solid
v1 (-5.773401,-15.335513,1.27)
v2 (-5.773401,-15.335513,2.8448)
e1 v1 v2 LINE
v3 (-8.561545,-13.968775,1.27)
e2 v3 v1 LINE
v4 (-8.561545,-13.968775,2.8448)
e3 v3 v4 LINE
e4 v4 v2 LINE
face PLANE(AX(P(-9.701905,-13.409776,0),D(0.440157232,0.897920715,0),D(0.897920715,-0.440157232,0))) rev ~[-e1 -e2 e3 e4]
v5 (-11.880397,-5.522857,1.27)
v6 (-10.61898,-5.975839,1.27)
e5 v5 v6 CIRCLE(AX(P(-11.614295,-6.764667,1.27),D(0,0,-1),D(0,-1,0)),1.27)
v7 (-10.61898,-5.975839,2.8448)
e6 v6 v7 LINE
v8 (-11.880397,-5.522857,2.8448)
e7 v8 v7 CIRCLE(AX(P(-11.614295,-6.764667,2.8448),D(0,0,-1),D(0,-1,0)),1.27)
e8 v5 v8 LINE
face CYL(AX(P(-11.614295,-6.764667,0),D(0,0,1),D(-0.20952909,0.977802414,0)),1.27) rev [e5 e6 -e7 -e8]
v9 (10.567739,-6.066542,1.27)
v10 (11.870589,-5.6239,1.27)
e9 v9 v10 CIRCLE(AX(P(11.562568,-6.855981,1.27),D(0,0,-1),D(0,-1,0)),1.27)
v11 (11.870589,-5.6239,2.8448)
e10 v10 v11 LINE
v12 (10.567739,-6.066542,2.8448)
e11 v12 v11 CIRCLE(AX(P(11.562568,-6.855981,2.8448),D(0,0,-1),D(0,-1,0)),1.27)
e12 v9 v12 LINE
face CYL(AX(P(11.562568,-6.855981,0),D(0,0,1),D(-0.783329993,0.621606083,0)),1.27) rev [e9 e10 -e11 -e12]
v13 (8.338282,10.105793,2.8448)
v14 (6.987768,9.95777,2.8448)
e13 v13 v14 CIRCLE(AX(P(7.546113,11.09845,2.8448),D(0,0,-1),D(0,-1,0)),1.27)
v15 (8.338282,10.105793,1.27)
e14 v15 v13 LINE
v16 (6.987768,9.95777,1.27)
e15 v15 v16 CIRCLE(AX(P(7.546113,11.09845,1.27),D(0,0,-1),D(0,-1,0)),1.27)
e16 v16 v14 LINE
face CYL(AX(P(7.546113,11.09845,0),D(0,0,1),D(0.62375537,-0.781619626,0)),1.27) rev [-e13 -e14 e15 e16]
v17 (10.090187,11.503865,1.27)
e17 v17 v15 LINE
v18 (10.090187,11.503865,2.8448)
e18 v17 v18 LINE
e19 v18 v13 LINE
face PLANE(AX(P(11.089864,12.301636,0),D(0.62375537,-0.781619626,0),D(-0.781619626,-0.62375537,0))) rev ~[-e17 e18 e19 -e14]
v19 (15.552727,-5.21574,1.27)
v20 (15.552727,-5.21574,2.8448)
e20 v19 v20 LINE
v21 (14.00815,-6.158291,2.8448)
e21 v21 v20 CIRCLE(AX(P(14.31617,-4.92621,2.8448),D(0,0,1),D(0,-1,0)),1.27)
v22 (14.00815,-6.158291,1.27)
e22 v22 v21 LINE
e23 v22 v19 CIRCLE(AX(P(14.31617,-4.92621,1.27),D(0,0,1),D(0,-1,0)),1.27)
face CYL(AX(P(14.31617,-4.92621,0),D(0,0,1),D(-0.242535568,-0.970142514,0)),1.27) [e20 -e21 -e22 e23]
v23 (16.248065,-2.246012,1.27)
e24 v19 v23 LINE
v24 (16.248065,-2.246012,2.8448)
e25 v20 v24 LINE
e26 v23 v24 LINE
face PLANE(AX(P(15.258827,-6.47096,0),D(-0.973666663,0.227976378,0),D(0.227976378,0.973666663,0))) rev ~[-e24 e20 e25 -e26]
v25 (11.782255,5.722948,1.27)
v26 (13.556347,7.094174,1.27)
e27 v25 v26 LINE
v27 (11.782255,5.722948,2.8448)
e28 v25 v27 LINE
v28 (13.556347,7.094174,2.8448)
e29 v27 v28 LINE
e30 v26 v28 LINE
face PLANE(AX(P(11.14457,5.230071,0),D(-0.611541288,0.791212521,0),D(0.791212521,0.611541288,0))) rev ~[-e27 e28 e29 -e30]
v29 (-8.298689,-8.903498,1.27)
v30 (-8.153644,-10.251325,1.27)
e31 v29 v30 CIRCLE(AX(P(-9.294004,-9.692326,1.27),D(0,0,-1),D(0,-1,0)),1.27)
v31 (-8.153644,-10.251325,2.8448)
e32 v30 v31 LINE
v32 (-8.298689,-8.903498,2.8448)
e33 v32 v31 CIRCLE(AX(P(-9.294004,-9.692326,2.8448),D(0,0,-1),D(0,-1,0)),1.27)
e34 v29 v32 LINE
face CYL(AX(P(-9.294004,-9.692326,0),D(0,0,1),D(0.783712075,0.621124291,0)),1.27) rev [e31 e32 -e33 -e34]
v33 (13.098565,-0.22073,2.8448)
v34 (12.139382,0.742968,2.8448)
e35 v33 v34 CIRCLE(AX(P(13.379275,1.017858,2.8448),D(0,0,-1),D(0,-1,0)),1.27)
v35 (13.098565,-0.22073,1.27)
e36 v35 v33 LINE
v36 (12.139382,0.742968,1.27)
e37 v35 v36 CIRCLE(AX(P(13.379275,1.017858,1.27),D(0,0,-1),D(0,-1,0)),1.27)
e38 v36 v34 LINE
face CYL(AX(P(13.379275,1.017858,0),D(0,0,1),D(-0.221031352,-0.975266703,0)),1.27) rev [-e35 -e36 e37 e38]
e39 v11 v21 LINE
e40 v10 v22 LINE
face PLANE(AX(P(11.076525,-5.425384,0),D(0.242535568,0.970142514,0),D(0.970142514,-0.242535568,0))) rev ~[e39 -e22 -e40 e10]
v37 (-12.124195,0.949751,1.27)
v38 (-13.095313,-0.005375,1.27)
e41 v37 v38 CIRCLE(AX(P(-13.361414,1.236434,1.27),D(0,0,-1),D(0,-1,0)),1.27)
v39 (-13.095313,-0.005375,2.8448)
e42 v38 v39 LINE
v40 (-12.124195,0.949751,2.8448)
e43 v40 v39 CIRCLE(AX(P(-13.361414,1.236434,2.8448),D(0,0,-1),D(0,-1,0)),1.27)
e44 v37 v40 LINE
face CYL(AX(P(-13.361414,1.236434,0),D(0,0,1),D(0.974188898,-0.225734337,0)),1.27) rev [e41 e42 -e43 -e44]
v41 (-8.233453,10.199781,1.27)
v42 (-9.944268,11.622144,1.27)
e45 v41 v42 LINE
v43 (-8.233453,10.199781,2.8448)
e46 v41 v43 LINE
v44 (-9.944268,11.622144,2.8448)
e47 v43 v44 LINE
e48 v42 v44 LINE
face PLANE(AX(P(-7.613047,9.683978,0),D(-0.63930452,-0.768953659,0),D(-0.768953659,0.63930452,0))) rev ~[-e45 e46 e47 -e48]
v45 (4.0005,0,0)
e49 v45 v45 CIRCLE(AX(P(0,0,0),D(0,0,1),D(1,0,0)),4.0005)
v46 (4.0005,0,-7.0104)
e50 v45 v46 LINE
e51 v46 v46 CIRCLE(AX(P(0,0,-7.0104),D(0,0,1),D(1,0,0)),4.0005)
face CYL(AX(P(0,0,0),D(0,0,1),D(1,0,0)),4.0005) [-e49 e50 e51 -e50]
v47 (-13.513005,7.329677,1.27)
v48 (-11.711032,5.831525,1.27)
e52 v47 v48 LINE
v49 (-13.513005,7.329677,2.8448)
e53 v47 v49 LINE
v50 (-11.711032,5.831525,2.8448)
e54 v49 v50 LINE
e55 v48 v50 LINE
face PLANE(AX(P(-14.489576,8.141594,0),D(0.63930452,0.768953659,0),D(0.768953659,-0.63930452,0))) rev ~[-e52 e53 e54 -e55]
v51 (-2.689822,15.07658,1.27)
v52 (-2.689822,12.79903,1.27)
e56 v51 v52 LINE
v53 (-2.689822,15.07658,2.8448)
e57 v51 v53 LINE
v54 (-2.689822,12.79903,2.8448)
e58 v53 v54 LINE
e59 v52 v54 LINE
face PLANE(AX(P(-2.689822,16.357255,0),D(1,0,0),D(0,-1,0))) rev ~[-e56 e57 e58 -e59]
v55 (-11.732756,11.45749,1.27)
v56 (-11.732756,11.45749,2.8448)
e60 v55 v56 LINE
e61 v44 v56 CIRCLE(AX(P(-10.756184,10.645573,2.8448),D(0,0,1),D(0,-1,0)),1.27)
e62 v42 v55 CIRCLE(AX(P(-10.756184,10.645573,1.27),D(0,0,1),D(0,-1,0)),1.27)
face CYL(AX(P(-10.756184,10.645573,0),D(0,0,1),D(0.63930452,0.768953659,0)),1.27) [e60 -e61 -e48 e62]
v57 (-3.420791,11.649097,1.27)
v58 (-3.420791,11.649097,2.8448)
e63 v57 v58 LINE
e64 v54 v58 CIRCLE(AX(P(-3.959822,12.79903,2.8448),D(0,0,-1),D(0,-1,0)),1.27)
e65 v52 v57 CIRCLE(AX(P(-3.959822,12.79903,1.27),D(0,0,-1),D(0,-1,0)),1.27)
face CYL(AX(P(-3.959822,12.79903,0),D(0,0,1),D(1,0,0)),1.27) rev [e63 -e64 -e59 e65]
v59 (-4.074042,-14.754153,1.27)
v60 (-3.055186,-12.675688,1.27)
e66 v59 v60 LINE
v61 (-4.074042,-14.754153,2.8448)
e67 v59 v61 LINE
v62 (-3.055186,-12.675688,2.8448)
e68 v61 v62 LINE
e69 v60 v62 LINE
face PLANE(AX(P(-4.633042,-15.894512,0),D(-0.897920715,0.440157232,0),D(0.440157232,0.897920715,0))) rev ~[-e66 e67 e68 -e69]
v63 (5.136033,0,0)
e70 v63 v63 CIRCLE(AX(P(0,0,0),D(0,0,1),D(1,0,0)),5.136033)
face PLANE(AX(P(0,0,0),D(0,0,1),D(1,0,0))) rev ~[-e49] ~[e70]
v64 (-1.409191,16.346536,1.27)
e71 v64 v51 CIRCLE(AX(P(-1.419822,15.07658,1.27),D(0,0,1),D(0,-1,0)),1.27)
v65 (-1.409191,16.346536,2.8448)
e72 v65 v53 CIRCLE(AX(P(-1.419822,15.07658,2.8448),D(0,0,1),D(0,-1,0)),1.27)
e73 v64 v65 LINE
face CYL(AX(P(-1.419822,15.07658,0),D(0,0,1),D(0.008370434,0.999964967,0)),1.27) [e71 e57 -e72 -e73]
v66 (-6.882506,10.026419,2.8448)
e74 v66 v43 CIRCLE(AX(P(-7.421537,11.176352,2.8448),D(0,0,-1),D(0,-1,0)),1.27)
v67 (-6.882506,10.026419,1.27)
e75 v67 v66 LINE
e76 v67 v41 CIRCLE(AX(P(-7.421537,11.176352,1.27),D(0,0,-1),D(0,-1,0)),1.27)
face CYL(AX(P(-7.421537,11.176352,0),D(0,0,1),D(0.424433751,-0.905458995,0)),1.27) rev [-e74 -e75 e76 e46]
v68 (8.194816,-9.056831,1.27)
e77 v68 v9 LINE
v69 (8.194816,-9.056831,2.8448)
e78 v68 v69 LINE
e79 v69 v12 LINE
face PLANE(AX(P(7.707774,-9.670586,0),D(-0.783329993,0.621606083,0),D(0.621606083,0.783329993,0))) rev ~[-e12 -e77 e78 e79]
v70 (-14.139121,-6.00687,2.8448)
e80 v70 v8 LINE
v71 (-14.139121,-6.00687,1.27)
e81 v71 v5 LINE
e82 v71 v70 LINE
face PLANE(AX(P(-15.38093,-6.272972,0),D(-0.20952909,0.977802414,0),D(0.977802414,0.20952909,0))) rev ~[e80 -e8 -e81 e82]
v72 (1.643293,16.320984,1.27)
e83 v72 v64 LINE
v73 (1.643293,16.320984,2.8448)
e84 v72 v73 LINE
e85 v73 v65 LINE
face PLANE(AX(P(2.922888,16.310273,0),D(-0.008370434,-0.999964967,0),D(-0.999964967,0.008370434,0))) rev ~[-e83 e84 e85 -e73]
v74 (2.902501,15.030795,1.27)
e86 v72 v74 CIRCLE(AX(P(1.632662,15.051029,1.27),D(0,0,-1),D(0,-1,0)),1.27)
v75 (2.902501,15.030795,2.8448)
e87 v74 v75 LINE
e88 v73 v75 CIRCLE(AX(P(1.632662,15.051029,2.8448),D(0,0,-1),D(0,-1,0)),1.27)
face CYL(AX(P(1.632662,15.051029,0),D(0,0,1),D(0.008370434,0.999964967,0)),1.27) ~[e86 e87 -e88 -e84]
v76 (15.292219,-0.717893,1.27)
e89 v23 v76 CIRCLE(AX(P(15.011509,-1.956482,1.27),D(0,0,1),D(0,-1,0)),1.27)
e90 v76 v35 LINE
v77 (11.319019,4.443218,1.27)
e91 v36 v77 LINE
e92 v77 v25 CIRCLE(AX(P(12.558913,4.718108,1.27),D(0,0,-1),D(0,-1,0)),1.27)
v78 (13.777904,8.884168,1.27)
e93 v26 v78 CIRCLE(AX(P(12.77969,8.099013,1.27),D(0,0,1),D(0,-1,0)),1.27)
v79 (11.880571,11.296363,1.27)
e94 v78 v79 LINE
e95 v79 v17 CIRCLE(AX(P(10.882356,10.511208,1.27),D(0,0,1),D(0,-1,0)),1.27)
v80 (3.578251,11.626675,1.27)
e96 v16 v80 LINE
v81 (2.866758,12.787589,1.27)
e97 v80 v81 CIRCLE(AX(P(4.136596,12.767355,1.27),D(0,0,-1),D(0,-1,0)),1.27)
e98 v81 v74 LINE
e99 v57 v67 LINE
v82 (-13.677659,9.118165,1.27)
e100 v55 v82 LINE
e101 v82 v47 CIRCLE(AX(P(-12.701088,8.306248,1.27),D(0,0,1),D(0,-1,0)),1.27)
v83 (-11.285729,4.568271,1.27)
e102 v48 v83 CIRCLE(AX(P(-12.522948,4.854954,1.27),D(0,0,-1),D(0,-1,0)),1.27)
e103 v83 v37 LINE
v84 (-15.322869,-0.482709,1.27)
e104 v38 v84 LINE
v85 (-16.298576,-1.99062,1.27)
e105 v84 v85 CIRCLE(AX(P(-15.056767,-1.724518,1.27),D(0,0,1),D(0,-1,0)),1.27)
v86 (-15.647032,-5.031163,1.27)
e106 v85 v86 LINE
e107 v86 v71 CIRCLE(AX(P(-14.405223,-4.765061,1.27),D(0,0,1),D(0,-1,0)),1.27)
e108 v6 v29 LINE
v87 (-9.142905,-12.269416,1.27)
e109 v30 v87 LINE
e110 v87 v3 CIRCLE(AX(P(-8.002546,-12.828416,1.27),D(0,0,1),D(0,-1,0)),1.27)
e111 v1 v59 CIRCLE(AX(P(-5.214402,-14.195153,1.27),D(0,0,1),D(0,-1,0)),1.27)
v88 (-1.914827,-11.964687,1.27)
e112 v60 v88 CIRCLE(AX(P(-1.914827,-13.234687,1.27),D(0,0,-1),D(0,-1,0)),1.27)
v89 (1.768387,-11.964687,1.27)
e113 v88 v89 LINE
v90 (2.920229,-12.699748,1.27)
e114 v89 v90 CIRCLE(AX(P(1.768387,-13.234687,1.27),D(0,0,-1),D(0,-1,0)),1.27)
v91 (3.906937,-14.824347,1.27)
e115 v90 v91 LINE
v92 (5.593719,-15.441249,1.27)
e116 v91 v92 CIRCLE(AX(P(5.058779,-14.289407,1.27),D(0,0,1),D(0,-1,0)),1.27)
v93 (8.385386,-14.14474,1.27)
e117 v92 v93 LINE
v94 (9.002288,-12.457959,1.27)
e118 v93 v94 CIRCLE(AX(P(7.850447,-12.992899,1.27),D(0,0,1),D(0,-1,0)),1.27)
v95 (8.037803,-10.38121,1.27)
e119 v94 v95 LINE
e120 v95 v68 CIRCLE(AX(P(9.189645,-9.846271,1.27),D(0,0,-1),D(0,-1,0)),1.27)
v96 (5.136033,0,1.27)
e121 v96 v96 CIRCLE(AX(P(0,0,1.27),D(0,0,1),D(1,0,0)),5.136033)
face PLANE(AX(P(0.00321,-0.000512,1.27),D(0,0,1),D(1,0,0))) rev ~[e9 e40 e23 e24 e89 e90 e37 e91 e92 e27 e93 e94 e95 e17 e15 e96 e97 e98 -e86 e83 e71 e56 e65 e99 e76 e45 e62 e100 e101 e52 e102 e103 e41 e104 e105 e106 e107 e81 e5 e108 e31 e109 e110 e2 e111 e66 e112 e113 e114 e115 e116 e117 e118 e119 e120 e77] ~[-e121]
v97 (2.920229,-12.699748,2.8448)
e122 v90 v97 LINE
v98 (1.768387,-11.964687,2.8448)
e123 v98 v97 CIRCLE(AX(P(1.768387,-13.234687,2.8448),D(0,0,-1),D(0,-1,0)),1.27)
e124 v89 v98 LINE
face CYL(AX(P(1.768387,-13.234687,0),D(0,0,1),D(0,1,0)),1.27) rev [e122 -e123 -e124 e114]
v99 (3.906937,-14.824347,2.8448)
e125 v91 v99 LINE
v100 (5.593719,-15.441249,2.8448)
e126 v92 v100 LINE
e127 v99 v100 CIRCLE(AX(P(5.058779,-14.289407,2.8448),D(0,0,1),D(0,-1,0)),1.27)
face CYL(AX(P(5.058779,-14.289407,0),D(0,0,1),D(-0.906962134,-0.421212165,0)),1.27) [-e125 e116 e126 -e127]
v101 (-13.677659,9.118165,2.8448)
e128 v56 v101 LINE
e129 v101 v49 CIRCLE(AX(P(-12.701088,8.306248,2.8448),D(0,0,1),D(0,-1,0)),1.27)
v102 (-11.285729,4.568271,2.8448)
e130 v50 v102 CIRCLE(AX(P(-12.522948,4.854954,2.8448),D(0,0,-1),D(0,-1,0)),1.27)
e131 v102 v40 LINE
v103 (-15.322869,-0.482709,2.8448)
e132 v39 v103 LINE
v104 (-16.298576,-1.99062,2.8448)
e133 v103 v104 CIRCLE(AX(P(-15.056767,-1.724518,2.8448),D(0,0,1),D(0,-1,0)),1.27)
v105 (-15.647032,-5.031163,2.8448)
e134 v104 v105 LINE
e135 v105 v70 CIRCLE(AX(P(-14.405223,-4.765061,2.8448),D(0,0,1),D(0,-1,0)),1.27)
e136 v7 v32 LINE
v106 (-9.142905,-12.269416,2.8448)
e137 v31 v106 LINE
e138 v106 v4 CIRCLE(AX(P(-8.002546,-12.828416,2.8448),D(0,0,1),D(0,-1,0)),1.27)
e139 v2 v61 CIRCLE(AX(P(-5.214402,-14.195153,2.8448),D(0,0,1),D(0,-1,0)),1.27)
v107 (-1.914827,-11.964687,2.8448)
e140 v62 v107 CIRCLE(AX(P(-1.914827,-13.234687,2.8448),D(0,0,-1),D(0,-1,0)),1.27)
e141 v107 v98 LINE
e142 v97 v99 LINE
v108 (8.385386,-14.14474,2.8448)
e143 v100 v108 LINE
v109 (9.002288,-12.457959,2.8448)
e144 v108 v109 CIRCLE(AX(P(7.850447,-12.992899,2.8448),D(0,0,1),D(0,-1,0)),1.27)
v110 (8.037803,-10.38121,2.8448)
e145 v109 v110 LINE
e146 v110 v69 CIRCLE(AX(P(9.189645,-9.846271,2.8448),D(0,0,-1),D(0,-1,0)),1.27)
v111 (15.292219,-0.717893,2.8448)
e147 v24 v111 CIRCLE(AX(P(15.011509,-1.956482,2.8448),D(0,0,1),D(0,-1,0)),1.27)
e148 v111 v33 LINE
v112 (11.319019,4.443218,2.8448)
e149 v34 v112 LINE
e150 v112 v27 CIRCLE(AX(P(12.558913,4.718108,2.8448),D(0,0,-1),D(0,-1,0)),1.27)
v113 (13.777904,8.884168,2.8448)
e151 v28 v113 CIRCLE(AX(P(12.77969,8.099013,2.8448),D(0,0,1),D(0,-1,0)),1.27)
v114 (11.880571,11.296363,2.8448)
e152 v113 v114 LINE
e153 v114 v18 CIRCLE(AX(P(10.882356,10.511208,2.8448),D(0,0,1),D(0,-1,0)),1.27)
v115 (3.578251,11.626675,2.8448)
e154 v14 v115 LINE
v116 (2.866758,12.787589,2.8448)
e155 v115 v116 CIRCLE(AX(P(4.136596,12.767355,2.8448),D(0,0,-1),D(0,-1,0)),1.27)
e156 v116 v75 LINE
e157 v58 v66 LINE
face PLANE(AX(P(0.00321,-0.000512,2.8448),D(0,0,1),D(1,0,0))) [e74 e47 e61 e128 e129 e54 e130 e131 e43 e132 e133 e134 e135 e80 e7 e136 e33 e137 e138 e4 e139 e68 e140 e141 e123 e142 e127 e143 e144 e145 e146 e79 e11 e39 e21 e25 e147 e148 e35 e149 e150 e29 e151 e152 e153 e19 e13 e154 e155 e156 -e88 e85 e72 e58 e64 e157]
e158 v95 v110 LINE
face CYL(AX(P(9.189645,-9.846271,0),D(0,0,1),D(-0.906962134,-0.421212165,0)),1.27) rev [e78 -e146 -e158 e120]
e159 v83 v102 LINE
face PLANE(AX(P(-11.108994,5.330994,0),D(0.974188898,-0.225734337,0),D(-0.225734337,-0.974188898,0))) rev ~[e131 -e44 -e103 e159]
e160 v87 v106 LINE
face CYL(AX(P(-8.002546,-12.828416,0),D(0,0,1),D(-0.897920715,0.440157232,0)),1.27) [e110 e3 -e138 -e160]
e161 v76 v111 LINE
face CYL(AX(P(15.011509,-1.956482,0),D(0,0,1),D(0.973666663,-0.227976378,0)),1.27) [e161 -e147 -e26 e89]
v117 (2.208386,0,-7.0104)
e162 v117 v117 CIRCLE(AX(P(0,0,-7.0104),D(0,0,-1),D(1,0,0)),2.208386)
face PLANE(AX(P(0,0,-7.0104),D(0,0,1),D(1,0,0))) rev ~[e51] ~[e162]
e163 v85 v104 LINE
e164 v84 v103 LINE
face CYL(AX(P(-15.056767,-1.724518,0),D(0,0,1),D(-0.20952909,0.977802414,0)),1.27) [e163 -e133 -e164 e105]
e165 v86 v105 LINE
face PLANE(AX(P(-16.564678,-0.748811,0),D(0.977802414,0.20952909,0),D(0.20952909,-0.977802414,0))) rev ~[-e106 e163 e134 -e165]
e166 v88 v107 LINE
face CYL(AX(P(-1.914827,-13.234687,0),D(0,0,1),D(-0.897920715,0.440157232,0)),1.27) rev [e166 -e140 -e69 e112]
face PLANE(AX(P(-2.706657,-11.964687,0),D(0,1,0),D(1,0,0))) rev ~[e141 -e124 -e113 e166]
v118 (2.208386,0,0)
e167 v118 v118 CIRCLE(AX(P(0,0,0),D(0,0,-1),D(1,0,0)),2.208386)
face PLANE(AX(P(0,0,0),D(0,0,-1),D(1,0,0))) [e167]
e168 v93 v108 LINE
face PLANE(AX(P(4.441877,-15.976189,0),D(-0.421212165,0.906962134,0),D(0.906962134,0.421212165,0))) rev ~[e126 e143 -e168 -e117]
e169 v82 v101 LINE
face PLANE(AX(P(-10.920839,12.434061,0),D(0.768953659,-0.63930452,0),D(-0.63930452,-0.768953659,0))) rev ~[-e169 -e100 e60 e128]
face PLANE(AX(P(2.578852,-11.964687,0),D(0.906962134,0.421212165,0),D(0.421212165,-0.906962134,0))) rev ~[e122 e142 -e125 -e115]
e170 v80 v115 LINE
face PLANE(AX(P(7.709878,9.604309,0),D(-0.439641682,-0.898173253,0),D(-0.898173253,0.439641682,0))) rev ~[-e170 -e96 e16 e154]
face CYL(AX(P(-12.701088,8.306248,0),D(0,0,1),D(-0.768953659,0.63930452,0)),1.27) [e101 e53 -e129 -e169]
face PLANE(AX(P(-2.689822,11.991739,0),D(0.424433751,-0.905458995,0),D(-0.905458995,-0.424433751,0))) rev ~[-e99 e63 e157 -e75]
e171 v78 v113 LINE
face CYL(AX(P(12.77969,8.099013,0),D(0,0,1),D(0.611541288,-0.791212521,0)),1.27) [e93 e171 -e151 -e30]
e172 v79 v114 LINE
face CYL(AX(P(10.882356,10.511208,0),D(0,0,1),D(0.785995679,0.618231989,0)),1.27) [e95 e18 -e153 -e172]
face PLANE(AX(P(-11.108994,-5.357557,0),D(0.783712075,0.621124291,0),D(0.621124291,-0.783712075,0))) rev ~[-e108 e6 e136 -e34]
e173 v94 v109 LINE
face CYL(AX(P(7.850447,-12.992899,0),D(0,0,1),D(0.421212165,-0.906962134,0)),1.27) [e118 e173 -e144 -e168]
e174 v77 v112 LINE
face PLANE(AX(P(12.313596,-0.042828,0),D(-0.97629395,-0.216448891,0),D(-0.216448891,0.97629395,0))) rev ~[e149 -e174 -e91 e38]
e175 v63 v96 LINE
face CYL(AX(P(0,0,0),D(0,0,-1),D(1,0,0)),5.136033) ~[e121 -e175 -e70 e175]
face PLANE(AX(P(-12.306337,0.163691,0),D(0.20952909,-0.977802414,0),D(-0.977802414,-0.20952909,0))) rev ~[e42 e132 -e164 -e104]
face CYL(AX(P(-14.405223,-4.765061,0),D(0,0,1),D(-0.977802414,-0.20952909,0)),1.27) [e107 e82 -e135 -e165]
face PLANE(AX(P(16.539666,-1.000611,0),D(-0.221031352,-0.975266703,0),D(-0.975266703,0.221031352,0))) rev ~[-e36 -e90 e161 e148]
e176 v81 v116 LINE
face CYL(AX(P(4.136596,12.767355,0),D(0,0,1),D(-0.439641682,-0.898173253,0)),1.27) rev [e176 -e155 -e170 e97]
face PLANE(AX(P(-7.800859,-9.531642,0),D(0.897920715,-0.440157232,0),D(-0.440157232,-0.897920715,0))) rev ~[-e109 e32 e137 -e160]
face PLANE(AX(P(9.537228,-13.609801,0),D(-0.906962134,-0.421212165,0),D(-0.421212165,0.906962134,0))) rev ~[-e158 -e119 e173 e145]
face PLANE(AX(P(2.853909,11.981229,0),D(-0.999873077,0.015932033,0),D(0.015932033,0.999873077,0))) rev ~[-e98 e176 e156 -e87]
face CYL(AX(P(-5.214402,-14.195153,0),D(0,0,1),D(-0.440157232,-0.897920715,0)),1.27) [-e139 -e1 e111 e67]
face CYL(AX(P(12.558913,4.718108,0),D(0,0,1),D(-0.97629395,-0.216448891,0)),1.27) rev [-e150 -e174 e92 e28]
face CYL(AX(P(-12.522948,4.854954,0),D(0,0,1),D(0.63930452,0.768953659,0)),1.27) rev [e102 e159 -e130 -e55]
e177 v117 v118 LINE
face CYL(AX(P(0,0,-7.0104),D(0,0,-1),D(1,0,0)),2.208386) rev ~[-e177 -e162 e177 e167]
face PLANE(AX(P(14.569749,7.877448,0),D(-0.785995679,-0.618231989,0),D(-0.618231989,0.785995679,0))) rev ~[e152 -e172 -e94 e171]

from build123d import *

# Parameters (mm, degrees)
F1_DEPTH  = 2.54
F2_SCALE  = 1.12
F3_R      = 1.27
F4_R      = 4.0005
F4_R_2    = 2.1462999284
F5_DEPTH  = 7.0104
F6_R      = 2.2083863112
F7_DEPTH  = 7.0104
F8_DEPTH  = 1.27
F9_R      = 5.1360331122
F10_DEPTH = 1.27


with BuildPart() as f1:
    # F0 (on Top) → F1 (new body)
    with BuildSketch(Plane.XY):
        Polygon((2.6097216178, 14.5627437159), (-2.4016266689, 14.6046923473), (-2.4016266689, 10.7069099322), (-6.7973635159, 8.6464090273), (-9.7507489845, 11.1018400639), (-12.9371215583, 7.269280193), (-9.9187448393, 4.759815731), (-10.987800546, 0.1461525389), (-14.7898914292, -0.6685812259), (-13.7329729143, -5.6008676039), (-9.9187448393, -4.7835330123), (-6.9650523365, -8.5103949532), (-8.662414737, -11.9730141014), (-4.136644538, -14.1915290003), (-2.4166579341, -10.6827564792), (2.3025460541, -10.6827564792), (3.9659612812, -14.2644541338), (8.5153820935, -12.1516080526), (6.8819414162, -8.6344521752), (9.8897544667, -4.8440932296), (13.6239528656, -5.7776425965), (14.7675592452, -0.8934023208), (10.9942825511, -0.0382388607), (9.9505092949, 4.6697063372), (13.008704409, 7.0334360935), (9.9016642198, 10.9836040065), (6.8838195875, 8.5752755404), (2.5481330231, 10.6975259259), align=None)
    extrude(amount=F1_DEPTH)


with BuildPart() as f1_1:
    # F2: moved
    add(f1.part.scale(F2_SCALE))

    # F3
    f3_edges = [f1_1.edges().sort_by_distance(p)[0] for p in [
        (-16.564678, -0.748811, 1.4224),
        (-12.306337, 0.163691, 1.4224),
        (-14.489576, 8.141594, 1.4224),
        (-10.920839, 12.434061, 1.4224),
        (-7.613047, 9.683978, 1.4224),
        (-2.689822, 11.991739, 1.4224),
        (-2.689822, 16.357255, 1.4224),
        (2.922888, 16.310273, 1.4224),
        (2.853909, 11.981229, 1.4224),
        (7.709878, 9.604309, 1.4224),
        (11.089864, 12.301636, 1.4224),
        (14.569749, 7.877448, 1.4224),
        (11.14457, 5.230071, 1.4224),
        (12.313596, -0.042828, 1.4224),
        (16.539666, -1.000611, 1.4224),
        (15.258827, -6.47096, 1.4224),
        (11.076525, -5.425384, 1.4224),
        (7.707774, -9.670586, 1.4224),
        (9.537228, -13.609801, 1.4224),
        (4.441877, -15.976189, 1.4224),
        (2.578852, -11.964687, 1.4224),
        (-2.706657, -11.964687, 1.4224),
        (-4.633042, -15.894512, 1.4224),
        (-9.701905, -13.409776, 1.4224),
        (-7.800859, -9.531642, 1.4224),
        (-11.108994, -5.357557, 1.4224),
        (-15.38093, -6.272972, 1.4224),
        (-11.108994, 5.330994, 1.4224),
    ]]
    fillet(f3_edges, radius=F3_R)

    # F4 (on face) → F5 (join)
    with BuildSketch(Plane.XY):
        Circle(F4_R)
        Circle(F4_R_2, mode=Mode.SUBTRACT)
        Circle(F4_R_2)
    extrude(amount=-F5_DEPTH)

    # F6 (on face) → F7 (cut)
    with BuildSketch(Plane(origin=(0, 0, -7.0104), x_dir=(1, 0, 0), z_dir=(0, 0, -1))):
        Circle(F6_R)
    extrude(amount=-F7_DEPTH, mode=Mode.SUBTRACT)

    # F8 (cut): a face of the model
    f8_faces = [f1_1.faces().sort_by_distance(p)[0] for p in [
        (5.0824398182, 10.382465325, 0),
    ]]
    extrude(f8_faces, amount=-F8_DEPTH, mode=Mode.SUBTRACT)

    # F9 (on face) → F10 (join)
    with BuildSketch(Plane.XY):
        Circle(F9_R)
    extrude(amount=F10_DEPTH)


solid = f1_1.part
